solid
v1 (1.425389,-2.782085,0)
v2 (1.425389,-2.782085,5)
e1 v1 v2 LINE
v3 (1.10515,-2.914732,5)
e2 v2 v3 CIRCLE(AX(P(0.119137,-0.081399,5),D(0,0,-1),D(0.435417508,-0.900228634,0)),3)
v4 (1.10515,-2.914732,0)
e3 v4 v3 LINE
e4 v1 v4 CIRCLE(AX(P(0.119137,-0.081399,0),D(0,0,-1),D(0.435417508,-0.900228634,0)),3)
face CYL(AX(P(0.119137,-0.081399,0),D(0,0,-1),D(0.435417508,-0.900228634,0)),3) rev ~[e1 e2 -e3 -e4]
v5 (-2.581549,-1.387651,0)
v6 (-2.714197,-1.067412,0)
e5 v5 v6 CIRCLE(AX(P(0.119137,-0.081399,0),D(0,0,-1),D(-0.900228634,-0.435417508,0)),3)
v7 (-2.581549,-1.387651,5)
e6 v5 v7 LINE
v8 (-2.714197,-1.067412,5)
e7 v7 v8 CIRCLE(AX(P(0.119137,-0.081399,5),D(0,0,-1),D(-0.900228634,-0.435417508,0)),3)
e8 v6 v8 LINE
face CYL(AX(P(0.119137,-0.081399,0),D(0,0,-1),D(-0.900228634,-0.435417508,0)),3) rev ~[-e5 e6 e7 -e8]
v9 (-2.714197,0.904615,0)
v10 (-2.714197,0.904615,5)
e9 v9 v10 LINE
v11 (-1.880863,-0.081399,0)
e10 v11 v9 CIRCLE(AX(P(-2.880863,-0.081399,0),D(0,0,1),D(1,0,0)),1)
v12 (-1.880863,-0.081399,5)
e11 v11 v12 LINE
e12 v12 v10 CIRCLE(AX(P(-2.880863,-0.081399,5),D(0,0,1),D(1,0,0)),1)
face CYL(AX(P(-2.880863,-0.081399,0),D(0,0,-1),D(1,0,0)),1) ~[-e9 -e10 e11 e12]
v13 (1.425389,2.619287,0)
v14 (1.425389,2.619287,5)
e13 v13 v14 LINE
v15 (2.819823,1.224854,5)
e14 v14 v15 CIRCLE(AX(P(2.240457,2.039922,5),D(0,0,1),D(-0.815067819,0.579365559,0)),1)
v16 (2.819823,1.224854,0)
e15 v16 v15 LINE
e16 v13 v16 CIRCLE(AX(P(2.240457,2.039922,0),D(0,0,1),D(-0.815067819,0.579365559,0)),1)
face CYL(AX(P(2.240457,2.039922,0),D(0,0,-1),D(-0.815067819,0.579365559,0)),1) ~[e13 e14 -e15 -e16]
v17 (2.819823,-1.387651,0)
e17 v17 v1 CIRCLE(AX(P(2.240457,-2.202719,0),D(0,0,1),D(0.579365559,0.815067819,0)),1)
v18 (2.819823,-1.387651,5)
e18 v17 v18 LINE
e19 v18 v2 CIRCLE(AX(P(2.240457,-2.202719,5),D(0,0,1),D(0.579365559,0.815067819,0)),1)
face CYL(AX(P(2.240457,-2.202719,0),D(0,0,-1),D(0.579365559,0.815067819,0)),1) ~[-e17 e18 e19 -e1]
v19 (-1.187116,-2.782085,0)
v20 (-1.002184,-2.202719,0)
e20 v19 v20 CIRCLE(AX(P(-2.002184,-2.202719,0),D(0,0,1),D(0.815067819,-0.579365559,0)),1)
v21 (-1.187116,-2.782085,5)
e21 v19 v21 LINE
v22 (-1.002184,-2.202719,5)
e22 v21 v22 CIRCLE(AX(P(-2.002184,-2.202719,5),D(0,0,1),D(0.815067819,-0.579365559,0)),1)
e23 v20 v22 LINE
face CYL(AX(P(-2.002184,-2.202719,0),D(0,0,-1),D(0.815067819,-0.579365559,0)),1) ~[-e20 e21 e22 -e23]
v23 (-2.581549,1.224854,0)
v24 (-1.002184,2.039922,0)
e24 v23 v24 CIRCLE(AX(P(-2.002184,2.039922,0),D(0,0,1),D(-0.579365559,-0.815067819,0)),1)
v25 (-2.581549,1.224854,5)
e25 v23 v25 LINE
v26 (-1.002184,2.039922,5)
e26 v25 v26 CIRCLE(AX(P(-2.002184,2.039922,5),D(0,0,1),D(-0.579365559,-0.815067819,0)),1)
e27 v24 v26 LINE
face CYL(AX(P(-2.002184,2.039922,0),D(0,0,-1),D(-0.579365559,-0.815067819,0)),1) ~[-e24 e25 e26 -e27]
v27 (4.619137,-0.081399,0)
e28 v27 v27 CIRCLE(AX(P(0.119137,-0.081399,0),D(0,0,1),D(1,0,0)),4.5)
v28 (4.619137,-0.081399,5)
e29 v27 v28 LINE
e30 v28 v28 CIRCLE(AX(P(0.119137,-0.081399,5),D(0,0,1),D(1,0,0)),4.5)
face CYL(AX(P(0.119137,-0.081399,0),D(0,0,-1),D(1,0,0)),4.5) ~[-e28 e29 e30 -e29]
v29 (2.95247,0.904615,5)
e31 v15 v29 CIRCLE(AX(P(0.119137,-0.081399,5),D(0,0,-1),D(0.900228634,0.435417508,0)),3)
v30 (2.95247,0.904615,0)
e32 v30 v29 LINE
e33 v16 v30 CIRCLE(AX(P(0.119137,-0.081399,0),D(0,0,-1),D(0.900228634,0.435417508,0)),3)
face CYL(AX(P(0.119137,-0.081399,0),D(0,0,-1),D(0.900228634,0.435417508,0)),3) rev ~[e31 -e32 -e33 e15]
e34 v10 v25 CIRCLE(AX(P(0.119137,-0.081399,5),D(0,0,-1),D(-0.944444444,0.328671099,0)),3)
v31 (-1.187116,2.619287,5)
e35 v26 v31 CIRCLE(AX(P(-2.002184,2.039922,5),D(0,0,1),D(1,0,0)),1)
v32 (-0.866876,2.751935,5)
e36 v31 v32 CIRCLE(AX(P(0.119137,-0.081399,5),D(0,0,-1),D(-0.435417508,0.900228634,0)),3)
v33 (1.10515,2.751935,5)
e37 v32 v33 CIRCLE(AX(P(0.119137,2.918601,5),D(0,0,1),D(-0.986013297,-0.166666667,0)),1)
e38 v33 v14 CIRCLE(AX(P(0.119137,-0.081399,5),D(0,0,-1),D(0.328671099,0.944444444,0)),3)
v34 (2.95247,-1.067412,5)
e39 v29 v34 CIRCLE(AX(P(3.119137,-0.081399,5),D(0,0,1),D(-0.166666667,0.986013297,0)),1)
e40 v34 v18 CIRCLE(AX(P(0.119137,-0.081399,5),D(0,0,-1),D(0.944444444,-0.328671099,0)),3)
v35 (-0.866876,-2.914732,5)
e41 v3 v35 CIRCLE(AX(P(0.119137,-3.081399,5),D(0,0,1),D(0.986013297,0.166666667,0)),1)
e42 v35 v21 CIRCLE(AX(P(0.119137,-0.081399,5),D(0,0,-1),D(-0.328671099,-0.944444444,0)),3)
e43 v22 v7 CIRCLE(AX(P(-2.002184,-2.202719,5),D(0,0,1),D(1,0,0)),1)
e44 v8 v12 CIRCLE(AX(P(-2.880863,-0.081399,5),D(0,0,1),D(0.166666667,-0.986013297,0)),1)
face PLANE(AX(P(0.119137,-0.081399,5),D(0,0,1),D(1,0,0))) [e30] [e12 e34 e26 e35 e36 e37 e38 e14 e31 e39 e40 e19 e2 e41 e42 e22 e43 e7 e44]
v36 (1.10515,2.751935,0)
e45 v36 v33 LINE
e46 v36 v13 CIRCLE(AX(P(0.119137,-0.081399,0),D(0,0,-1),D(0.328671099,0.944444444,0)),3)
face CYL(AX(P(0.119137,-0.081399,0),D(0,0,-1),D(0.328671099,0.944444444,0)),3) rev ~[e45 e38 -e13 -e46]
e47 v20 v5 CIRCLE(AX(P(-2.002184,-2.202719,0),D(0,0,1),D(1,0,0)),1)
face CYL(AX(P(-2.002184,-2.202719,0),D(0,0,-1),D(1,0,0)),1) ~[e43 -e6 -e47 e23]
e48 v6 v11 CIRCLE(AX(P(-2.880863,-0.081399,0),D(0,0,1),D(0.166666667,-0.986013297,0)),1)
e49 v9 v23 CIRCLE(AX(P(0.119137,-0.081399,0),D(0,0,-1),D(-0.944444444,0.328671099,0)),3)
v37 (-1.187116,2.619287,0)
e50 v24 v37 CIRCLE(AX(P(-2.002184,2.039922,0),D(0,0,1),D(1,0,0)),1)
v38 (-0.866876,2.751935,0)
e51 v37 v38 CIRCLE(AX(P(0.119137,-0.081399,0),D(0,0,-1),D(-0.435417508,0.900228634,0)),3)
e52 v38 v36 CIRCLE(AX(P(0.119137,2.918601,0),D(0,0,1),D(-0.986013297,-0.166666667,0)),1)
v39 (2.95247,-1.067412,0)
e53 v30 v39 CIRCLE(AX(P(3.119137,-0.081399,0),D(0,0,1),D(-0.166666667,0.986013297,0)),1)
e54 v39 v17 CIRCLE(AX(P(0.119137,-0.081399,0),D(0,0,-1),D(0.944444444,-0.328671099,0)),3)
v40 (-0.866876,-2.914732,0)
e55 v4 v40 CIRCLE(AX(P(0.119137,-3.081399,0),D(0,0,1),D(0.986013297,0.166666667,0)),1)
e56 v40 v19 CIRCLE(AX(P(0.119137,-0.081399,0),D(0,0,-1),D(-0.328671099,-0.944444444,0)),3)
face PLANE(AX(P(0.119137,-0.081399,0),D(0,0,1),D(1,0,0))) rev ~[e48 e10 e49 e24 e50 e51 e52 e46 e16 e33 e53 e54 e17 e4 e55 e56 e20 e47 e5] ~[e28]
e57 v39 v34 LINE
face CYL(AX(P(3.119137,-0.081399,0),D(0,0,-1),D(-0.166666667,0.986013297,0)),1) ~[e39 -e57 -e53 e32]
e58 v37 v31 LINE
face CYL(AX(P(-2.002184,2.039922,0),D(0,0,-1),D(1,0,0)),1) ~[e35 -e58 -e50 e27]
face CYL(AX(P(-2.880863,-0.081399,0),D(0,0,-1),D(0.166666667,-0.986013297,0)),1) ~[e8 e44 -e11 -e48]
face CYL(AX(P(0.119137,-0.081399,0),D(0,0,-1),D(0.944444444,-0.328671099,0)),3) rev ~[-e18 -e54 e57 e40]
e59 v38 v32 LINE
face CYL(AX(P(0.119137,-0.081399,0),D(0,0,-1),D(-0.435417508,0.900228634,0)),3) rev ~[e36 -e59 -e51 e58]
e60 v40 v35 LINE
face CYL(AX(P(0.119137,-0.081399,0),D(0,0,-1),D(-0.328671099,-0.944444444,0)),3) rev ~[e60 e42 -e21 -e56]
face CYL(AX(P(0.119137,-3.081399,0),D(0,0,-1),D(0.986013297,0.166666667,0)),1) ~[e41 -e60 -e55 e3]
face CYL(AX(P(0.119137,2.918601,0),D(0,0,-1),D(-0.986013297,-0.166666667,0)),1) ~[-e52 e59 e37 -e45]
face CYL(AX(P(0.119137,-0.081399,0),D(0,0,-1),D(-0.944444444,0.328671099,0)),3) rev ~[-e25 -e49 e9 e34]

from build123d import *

# Parameters (mm, degrees)
F0_R     = 4.5
F1_DEPTH = 5


with BuildPart() as f1:
    # F0 (on Top) → F1 (new body)
    with BuildSketch(Plane.XY):
        with Locations((0.1191368252, -0.0813986216)):
            Circle(F0_R)
        with BuildLine():
            ThreePointArc((2.8198227273, 1.224853903), (2.8907754227, 1.0666516755), (2.9524701585, 0.9046146756))
            ThreePointArc((2.9524701585, 0.9046146756), (3.7646340496, 0.6823639942), (4.1191368252, -0.0813986216))
            ThreePointArc((4.1191368252, -0.0813986216), (3.7646340496, -0.8451612374), (2.9524701585, -1.0674119188))
            ThreePointArc((2.9524701585, -1.0674119188), (2.8907754227, -1.2294489187), (2.8198227273, -1.3876511462))
            ThreePointArc((2.8198227273, -1.3876511462), (3.129098142, -1.7441154101), (3.2404571688, -2.2027189652))
            ThreePointArc((3.2404571688, -2.2027189652), (2.5445395433, -3.155364707), (1.4253893498, -2.7820845237))
            ThreePointArc((1.4253893498, -2.7820845237), (1.2671871223, -2.8530372191), (1.1051501224, -2.9147319549))
            ThreePointArc((1.1051501224, -2.9147319549), (1.1156340147, -2.9977723613), (1.1191368252, -3.0813986216))
            ThreePointArc((1.1191368252, -3.0813986216), (0.0355105649, -4.0778958111), (-0.866876472, -2.9147319549))
            ThreePointArc((-0.866876472, -2.9147319549), (-1.0289134719, -2.8530372191), (-1.1871156994, -2.7820845237))
            ThreePointArc((-1.1871156994, -2.7820845237), (-2.7092902995, -2.9098257463), (-2.5815490769, -1.3876511462))
            ThreePointArc((-2.5815490769, -1.3876511462), (-2.6525017723, -1.2294489187), (-2.7141965081, -1.0674119188))
            ThreePointArc((-2.7141965081, -1.0674119188), (-3.8808631748, -0.0813986216), (-2.7141965081, 0.9046146756))
            ThreePointArc((-2.7141965081, 0.9046146756), (-2.6525017723, 1.0666516755), (-2.5815490769, 1.224853903))
            ThreePointArc((-2.5815490769, 1.224853903), (-2.7092902995, 2.7470285031), (-1.1871156994, 2.6192872805))
            ThreePointArc((-1.1871156994, 2.6192872805), (-1.0289134719, 2.6902399759), (-0.866876472, 2.7519347117))
            ThreePointArc((-0.866876472, 2.7519347117), (0.0355105649, 3.9150985679), (1.1191368252, 2.9186013784))
            ThreePointArc((1.1191368252, 2.9186013784), (1.1156340147, 2.8349751181), (1.1051501224, 2.7519347117))
            ThreePointArc((1.1051501224, 2.7519347117), (1.2671871223, 2.6902399759), (1.4253893498, 2.6192872805))
            ThreePointArc((1.4253893498, 2.6192872805), (2.5445395433, 2.9925674638), (3.2404571688, 2.039921722))
            ThreePointArc((3.2404571688, 2.039921722), (3.129098142, 1.5813181669), (2.8198227273, 1.224853903))
        make_face(mode=Mode.SUBTRACT)
        with BuildLine():
            ThreePointArc((2.9524701585, -1.0674119188), (3.0771767168, -0.5813986216), (3.1191368252, -0.0813986216))
            ThreePointArc((3.1191368252, -0.0813986216), (3.0771767168, 0.4186013784), (2.9524701585, 0.9046146756))
            ThreePointArc((2.9524701585, 0.9046146756), (2.1191368252, -0.0813986216), (2.9524701585, -1.0674119188))
        make_face()
        with BuildLine():
            ThreePointArc((2.9524701585, 0.9046146756), (3.0771767168, 0.4186013784), (3.1191368252, -0.0813986216))
            ThreePointArc((3.1191368252, -0.0813986216), (3.0771767168, -0.5813986216), (2.9524701585, -1.0674119188))
            ThreePointArc((2.9524701585, -1.0674119188), (3.7646340496, -0.8451612374), (4.1191368252, -0.0813986216))
            ThreePointArc((4.1191368252, -0.0813986216), (3.7646340496, 0.6823639942), (2.9524701585, 0.9046146756))
        make_face()
        with BuildLine():
            ThreePointArc((1.4253893498, 2.6192872805), (1.5333503876, 1.3328149408), (2.8198227273, 1.224853903))
            ThreePointArc((2.8198227273, 1.224853903), (2.2404571688, 2.039921722), (1.4253893498, 2.6192872805))
        make_face()
        with BuildLine():
            ThreePointArc((1.4253893498, 2.6192872805), (2.2404571688, 2.039921722), (2.8198227273, 1.224853903))
            ThreePointArc((2.8198227273, 1.224853903), (3.129098142, 1.5813181669), (3.2404571688, 2.039921722))
            ThreePointArc((3.2404571688, 2.039921722), (2.5445395433, 2.9925674638), (1.4253893498, 2.6192872805))
        make_face()
        with BuildLine():
            ThreePointArc((3.2404571688, -2.2027189652), (3.129098142, -1.7441154101), (2.8198227273, -1.3876511462))
            ThreePointArc((2.8198227273, -1.3876511462), (2.2404571688, -2.2027189652), (1.4253893498, -2.7820845237))
            ThreePointArc((1.4253893498, -2.7820845237), (2.5445395433, -3.155364707), (3.2404571688, -2.2027189652))
        make_face()
        with BuildLine():
            ThreePointArc((1.4253893498, -2.7820845237), (2.2404571688, -2.2027189652), (2.8198227273, -1.3876511462))
            ThreePointArc((2.8198227273, -1.3876511462), (1.5333503876, -1.495612184), (1.4253893498, -2.7820845237))
        make_face()
        with BuildLine():
            ThreePointArc((-0.866876472, 2.7519347117), (0.1191368252, 1.9186013784), (1.1051501224, 2.7519347117))
            ThreePointArc((1.1051501224, 2.7519347117), (0.1191368252, 2.9186013784), (-0.866876472, 2.7519347117))
        make_face()
        with BuildLine():
            ThreePointArc((-0.866876472, 2.7519347117), (0.1191368252, 2.9186013784), (1.1051501224, 2.7519347117))
            ThreePointArc((1.1051501224, 2.7519347117), (1.1156340147, 2.8349751181), (1.1191368252, 2.9186013784))
            ThreePointArc((1.1191368252, 2.9186013784), (0.0355105649, 3.9150985679), (-0.866876472, 2.7519347117))
        make_face()
        with BuildLine():
            ThreePointArc((1.1191368252, -3.0813986216), (1.1156340147, -2.9977723613), (1.1051501224, -2.9147319549))
            ThreePointArc((1.1051501224, -2.9147319549), (0.1191368252, -3.0813986216), (-0.866876472, -2.9147319549))
            ThreePointArc((-0.866876472, -2.9147319549), (0.0355105649, -4.0778958111), (1.1191368252, -3.0813986216))
        make_face()
        with BuildLine():
            ThreePointArc((-0.866876472, -2.9147319549), (0.1191368252, -3.0813986216), (1.1051501224, -2.9147319549))
            ThreePointArc((1.1051501224, -2.9147319549), (0.1191368252, -2.0813986216), (-0.866876472, -2.9147319549))
        make_face()
        with BuildLine():
            ThreePointArc((-1.0021835184, 2.039921722), (-1.0495377765, 2.3440040965), (-1.1871156994, 2.6192872805))
            ThreePointArc((-1.1871156994, 2.6192872805), (-2.0021835184, 2.039921722), (-2.5815490769, 1.224853903))
            ThreePointArc((-2.5815490769, 1.224853903), (-1.5435799633, 1.1512807487), (-1.0021835184, 2.039921722))
        make_face()
        with BuildLine():
            ThreePointArc((-2.5815490769, 1.224853903), (-2.0021835184, 2.039921722), (-1.1871156994, 2.6192872805))
            ThreePointArc((-1.1871156994, 2.6192872805), (-2.7092902995, 2.7470285031), (-2.5815490769, 1.224853903))
        make_face()
        with BuildLine():
            ThreePointArc((-2.5815490769, -1.3876511462), (-2.7092902995, -2.9098257463), (-1.1871156994, -2.7820845237))
            ThreePointArc((-1.1871156994, -2.7820845237), (-2.0021835184, -2.2027189652), (-2.5815490769, -1.3876511462))
        make_face()
        with BuildLine():
            ThreePointArc((-2.5815490769, -1.3876511462), (-2.0021835184, -2.2027189652), (-1.1871156994, -2.7820845237))
            ThreePointArc((-1.1871156994, -2.7820845237), (-1.0495377765, -2.5068013397), (-1.0021835184, -2.2027189652))
            ThreePointArc((-1.0021835184, -2.2027189652), (-1.5435799633, -1.3140779919), (-2.5815490769, -1.3876511462))
        make_face()
        with BuildLine():
            ThreePointArc((-1.8808631748, -0.0813986216), (-2.117100559, 0.5640986028), (-2.7141965081, 0.9046146756))
            ThreePointArc((-2.7141965081, 0.9046146756), (-2.8808631748, -0.0813986216), (-2.7141965081, -1.0674119188))
            ThreePointArc((-2.7141965081, -1.0674119188), (-2.117100559, -0.726895846), (-1.8808631748, -0.0813986216))
        make_face()
        with BuildLine():
            ThreePointArc((-2.7141965081, -1.0674119188), (-2.8808631748, -0.0813986216), (-2.7141965081, 0.9046146756))
            ThreePointArc((-2.7141965081, 0.9046146756), (-3.8808631748, -0.0813986216), (-2.7141965081, -1.0674119188))
        make_face()
    extrude(amount=F1_DEPTH)


solid = f1.part
